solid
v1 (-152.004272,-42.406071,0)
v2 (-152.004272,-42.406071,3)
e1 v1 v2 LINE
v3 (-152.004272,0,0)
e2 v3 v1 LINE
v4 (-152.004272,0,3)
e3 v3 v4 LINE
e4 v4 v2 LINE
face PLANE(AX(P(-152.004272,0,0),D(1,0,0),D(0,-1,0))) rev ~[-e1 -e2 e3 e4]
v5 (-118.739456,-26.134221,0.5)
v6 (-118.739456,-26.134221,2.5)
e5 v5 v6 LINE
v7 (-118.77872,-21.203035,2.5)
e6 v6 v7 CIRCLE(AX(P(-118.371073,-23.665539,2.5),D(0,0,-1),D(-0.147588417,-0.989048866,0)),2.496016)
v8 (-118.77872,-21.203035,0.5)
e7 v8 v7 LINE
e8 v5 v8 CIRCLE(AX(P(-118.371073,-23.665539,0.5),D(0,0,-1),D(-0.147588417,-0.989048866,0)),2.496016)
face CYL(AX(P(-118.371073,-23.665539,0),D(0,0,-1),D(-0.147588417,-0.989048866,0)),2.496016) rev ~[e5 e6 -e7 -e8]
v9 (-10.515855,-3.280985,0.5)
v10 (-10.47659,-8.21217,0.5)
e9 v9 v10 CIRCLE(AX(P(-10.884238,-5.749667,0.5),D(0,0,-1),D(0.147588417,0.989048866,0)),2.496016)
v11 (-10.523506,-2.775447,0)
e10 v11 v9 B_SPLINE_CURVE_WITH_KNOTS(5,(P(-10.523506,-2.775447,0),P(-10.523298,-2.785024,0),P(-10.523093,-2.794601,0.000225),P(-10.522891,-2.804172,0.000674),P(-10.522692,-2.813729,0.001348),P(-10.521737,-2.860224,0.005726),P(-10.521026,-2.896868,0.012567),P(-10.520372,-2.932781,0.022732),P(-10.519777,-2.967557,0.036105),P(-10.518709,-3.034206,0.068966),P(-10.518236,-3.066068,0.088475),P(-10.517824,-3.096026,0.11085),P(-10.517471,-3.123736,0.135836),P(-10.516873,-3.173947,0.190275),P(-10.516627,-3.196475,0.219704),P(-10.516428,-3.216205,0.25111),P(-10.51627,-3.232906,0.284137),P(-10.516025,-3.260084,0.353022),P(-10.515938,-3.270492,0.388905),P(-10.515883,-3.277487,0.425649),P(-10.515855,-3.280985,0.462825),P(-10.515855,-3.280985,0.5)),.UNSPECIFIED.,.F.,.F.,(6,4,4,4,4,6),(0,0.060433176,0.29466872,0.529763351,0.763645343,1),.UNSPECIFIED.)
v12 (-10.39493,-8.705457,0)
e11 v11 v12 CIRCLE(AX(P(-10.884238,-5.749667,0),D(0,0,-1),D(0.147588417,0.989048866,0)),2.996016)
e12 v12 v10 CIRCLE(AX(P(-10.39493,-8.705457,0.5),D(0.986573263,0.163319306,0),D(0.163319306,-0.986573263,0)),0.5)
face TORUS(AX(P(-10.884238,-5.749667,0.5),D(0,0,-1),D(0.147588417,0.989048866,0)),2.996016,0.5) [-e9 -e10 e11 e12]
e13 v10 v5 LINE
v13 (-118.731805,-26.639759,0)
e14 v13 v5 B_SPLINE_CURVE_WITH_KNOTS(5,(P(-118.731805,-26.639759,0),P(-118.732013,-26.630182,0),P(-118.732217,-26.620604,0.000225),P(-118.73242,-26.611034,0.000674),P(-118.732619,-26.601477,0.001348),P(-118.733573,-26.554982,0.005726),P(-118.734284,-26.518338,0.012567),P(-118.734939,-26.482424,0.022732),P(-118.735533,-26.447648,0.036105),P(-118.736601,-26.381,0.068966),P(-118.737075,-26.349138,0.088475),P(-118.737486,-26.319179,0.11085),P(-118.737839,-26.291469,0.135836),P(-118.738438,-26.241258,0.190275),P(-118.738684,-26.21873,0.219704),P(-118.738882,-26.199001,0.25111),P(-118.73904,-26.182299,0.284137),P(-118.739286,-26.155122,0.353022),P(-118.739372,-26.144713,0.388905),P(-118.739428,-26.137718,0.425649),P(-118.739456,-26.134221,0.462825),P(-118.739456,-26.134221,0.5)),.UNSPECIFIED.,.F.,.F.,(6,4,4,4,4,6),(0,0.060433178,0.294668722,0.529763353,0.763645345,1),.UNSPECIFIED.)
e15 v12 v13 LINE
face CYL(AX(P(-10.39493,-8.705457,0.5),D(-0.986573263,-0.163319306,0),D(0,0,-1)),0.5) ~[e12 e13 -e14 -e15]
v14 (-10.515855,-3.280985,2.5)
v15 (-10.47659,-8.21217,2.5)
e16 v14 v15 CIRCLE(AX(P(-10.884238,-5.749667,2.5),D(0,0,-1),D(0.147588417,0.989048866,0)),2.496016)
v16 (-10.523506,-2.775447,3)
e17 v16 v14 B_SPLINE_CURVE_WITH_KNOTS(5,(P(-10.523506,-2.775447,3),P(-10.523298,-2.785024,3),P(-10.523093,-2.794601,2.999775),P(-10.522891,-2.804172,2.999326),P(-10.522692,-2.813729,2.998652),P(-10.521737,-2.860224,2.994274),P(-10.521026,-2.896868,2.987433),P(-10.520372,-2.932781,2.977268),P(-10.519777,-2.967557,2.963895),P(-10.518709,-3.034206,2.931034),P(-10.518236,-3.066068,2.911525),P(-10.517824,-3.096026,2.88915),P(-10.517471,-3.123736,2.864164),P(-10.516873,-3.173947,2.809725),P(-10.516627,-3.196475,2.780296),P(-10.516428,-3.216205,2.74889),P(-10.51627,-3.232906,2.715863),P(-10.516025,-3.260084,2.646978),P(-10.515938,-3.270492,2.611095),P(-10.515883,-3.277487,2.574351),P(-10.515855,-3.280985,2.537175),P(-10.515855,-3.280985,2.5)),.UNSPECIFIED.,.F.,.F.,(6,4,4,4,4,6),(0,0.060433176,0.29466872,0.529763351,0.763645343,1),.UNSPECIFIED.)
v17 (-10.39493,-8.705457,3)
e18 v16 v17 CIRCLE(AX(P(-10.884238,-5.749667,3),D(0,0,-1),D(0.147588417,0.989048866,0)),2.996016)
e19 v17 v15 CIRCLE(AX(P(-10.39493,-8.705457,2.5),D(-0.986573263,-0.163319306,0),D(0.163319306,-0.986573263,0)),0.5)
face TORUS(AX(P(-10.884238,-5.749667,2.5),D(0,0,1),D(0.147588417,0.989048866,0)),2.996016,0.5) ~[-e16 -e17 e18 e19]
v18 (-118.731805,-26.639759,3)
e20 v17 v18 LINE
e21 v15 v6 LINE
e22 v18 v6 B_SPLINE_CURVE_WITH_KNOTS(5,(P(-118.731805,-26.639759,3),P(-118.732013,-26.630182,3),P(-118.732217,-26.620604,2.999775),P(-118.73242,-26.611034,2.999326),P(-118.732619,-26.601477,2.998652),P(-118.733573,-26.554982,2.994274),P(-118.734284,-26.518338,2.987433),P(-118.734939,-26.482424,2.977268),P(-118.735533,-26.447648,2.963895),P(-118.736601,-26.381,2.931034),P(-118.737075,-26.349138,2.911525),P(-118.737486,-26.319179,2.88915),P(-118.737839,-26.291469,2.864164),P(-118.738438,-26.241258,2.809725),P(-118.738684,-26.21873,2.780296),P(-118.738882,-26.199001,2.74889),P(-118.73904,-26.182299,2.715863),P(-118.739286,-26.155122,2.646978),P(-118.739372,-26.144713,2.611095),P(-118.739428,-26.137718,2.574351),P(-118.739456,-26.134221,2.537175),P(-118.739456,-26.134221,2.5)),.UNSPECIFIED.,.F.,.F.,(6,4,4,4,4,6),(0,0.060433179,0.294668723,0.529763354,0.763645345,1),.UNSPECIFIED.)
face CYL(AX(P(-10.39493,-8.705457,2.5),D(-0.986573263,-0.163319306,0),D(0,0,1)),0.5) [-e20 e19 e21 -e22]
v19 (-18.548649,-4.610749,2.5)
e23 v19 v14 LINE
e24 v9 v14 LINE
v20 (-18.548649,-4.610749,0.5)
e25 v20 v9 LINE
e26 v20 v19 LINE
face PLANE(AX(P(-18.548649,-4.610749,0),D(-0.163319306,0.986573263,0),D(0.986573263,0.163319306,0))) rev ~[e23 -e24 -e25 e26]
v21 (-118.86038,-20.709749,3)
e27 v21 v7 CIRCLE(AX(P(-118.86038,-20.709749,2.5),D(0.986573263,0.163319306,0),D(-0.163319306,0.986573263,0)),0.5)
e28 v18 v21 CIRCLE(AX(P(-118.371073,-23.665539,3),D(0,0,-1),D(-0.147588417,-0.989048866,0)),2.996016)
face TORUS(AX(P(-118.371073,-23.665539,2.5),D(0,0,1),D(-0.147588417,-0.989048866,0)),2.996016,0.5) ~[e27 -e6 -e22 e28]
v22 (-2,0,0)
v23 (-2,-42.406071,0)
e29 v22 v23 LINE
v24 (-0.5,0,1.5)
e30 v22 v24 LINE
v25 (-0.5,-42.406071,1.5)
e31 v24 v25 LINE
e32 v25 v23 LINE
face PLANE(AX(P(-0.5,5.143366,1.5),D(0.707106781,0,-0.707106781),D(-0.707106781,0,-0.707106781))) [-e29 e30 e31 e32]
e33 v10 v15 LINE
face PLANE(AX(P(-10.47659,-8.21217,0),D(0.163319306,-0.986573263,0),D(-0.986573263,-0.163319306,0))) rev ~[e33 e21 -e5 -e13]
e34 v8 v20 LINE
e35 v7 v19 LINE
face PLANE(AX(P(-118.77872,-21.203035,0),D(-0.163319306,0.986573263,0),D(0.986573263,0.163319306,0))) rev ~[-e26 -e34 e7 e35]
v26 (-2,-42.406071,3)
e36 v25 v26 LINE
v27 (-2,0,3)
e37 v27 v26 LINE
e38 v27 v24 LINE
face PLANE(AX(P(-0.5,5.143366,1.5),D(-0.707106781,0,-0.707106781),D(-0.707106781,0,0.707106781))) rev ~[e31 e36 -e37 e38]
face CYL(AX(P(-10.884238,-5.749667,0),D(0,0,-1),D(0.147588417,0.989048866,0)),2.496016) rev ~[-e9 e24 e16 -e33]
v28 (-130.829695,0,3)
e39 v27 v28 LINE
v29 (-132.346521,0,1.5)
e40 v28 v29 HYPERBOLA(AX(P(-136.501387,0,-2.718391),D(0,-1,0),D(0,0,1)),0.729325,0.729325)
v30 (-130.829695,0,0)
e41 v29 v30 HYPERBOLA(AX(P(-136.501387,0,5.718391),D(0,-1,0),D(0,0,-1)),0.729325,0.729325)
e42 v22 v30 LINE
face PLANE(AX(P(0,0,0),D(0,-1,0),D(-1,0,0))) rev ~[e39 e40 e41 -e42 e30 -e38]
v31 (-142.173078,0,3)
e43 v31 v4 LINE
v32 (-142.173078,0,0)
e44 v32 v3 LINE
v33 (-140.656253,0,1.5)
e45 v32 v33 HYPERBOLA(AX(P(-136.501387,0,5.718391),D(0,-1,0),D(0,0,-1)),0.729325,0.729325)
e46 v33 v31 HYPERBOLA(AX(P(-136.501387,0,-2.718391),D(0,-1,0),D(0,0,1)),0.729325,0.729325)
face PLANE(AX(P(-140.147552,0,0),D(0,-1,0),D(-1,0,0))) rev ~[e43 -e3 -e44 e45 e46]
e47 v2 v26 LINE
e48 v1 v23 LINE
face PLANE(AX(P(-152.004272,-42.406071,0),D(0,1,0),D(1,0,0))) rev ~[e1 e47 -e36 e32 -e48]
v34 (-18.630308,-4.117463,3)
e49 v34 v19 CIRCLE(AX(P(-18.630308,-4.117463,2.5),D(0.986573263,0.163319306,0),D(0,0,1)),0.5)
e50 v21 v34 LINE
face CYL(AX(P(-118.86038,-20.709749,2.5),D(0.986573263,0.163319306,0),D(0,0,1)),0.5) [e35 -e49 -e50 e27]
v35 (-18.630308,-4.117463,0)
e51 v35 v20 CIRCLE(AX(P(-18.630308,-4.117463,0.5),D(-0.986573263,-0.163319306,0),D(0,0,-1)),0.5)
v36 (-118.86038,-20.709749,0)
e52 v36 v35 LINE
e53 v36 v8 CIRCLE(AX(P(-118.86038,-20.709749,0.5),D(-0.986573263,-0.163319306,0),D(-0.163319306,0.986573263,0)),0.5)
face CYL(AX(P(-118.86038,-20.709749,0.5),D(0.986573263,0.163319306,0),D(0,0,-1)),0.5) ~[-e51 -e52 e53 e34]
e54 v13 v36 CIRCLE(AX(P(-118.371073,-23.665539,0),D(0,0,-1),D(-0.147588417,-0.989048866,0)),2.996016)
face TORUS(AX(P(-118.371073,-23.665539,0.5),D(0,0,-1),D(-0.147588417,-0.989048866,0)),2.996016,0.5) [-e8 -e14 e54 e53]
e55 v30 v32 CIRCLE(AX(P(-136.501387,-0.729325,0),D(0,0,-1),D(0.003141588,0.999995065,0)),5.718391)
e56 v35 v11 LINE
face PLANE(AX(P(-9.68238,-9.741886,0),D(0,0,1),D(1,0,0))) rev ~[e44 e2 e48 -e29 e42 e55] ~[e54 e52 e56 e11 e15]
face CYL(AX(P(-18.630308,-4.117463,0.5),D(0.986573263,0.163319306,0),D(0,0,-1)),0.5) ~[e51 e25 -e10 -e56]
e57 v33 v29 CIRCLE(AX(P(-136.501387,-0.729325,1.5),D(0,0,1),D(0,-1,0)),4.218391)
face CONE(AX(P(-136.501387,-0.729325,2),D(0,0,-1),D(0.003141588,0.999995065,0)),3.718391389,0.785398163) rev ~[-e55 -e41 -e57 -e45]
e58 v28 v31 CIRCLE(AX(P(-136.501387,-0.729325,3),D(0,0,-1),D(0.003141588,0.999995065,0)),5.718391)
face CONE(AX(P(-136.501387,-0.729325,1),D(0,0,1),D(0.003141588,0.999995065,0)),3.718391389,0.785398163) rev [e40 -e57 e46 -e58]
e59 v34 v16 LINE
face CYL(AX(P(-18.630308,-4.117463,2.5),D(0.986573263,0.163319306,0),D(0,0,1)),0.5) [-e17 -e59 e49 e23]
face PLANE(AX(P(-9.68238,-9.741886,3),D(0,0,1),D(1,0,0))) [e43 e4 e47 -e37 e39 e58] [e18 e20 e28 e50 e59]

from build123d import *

# Parameters (mm, degrees)
F1_DEPTH    = 3
F2_T1_DEPTH = 52.6928029293
F2_T4_ANGLE = 359.64
F2_T6_ANGLE = 359.64
F3_R        = 0.5


# Not quite as in the source:
# - a fillet or chamfer that OpenCascade refuses, or shapes differently, is made with other operations: its cross-section is extruded or revolved along the edge and cut away or added


with BuildPart() as f1:
    # F0 (on Top) → F1 (new body)
    with BuildSketch(Plane.XY):
        with BuildLine():
            Line((0, -21.2030354887), (0, 0))
            Line((0, 0), (-18.5486488044, 0))
            Line((-18.5486488044, 0), (-18.5486488044, -4.6107494656))
            Line((-18.5486488044, -4.6107494656), (-10.5158546939, -3.2809847035))
            ThreePointArc((-10.5158546939, -3.2809847035), (-8.3883004552, -5.7297930738), (-10.4765901342, -8.212170098))
            Line((-10.4765901342, -8.212170098), (-18.5486488044, -9.5484347937))
            Line((-18.5486488044, -9.5484347937), (-18.5486488044, -21.2030354887))
            Line((-18.5486488044, -21.2030354887), (0, -21.2030354887))
        make_face()
        with BuildLine():
            Line((-18.5486488044, -4.6107494656), (-18.5486488044, 0))
            Line((-18.5486488044, 0), (-132.8552216291, 0))
            ThreePointArc((-132.8552216291, 0), (-136.5013867617, -4.4477159734), (-140.1475518942, 0))
            Line((-140.1475518942, 0), (-152.0042717457, 0))
            Line((-152.0042717457, 0), (-152.0042717457, -42.4060709774))
            Line((-152.0042717457, -42.4060709774), (0, -42.4060709774))
            Line((0, -42.4060709774), (0, -21.2030354887))
            Line((0, -21.2030354887), (-18.5486488044, -21.2030354887))
            Line((-18.5486488044, -21.2030354887), (-18.5486488044, -9.5484347937))
            Line((-18.5486488044, -9.5484347937), (-118.7394559383, -26.1342208833))
            ThreePointArc((-118.7394559383, -26.1342208833), (-120.8670101771, -23.6854125129), (-118.7787204981, -21.2030354887))
            Line((-118.7787204981, -21.2030354887), (-18.5486488044, -4.6107494656))
        make_face()
    extrude(amount=F1_DEPTH)

    # F2: chamfer of 2 on 4 edges, made by hand

    # F2_s2 → F2_t1 (cut)
    with BuildSketch(Plane.XZ.offset(-5.1433659759)):
        Polygon((0, 1), (-2, 3), (0, 3), align=None)
        Polygon((0, 2), (-2, 0), (0, 0), align=None)
    extrude(amount=F2_T1_DEPTH, mode=Mode.SUBTRACT)

    # F2_s3 → F2_t4 (revolve, cut)
    with BuildSketch(Plane(origin=(-136.4977483257, 0.4288217341, 0), x_dir=(0, 0, 1), z_dir=(-0.9999950652, 0.0031415875, 0))):
        Polygon((1, 2.5602393555), (3, 4.5602393555), (3, 2.5602393555), align=None)
    revolve(axis=Axis((-136.5013867617, -0.7293245843, 3), (0, 0, -1)), revolution_arc=F2_T4_ANGLE, mode=Mode.SUBTRACT)

    # F2_s5 → F2_t6 (revolve, cut)
    with BuildSketch(Plane(origin=(-136.4977483257, 0.4288217341, 0), x_dir=(0, 0, 1), z_dir=(-0.9999950652, 0.0031415875, 0))):
        Polygon((2, 2.5602393555), (0, 4.5602393555), (0, 2.5602393555), align=None)
    revolve(axis=Axis((-136.5013867617, -0.7293245843, 0), (0, 0, -1)), revolution_arc=F2_T6_ANGLE, mode=Mode.SUBTRACT)

    # F3
    f3_edges = [f1.edges().sort_by_distance(p)[0] for p in [
        (-64.647288, -12.24201, 3),
        (-64.608023, -17.173195, 3),
        (-120.86701, -23.685413, 3),
        (-8.3883, -5.729793, 3),
        (-64.647288, -12.24201, 0),
        (-8.3883, -5.729793, 0),
        (-120.86701, -23.685413, 0),
    ]]
    fillet(f3_edges, radius=F3_R)


solid = f1.part
